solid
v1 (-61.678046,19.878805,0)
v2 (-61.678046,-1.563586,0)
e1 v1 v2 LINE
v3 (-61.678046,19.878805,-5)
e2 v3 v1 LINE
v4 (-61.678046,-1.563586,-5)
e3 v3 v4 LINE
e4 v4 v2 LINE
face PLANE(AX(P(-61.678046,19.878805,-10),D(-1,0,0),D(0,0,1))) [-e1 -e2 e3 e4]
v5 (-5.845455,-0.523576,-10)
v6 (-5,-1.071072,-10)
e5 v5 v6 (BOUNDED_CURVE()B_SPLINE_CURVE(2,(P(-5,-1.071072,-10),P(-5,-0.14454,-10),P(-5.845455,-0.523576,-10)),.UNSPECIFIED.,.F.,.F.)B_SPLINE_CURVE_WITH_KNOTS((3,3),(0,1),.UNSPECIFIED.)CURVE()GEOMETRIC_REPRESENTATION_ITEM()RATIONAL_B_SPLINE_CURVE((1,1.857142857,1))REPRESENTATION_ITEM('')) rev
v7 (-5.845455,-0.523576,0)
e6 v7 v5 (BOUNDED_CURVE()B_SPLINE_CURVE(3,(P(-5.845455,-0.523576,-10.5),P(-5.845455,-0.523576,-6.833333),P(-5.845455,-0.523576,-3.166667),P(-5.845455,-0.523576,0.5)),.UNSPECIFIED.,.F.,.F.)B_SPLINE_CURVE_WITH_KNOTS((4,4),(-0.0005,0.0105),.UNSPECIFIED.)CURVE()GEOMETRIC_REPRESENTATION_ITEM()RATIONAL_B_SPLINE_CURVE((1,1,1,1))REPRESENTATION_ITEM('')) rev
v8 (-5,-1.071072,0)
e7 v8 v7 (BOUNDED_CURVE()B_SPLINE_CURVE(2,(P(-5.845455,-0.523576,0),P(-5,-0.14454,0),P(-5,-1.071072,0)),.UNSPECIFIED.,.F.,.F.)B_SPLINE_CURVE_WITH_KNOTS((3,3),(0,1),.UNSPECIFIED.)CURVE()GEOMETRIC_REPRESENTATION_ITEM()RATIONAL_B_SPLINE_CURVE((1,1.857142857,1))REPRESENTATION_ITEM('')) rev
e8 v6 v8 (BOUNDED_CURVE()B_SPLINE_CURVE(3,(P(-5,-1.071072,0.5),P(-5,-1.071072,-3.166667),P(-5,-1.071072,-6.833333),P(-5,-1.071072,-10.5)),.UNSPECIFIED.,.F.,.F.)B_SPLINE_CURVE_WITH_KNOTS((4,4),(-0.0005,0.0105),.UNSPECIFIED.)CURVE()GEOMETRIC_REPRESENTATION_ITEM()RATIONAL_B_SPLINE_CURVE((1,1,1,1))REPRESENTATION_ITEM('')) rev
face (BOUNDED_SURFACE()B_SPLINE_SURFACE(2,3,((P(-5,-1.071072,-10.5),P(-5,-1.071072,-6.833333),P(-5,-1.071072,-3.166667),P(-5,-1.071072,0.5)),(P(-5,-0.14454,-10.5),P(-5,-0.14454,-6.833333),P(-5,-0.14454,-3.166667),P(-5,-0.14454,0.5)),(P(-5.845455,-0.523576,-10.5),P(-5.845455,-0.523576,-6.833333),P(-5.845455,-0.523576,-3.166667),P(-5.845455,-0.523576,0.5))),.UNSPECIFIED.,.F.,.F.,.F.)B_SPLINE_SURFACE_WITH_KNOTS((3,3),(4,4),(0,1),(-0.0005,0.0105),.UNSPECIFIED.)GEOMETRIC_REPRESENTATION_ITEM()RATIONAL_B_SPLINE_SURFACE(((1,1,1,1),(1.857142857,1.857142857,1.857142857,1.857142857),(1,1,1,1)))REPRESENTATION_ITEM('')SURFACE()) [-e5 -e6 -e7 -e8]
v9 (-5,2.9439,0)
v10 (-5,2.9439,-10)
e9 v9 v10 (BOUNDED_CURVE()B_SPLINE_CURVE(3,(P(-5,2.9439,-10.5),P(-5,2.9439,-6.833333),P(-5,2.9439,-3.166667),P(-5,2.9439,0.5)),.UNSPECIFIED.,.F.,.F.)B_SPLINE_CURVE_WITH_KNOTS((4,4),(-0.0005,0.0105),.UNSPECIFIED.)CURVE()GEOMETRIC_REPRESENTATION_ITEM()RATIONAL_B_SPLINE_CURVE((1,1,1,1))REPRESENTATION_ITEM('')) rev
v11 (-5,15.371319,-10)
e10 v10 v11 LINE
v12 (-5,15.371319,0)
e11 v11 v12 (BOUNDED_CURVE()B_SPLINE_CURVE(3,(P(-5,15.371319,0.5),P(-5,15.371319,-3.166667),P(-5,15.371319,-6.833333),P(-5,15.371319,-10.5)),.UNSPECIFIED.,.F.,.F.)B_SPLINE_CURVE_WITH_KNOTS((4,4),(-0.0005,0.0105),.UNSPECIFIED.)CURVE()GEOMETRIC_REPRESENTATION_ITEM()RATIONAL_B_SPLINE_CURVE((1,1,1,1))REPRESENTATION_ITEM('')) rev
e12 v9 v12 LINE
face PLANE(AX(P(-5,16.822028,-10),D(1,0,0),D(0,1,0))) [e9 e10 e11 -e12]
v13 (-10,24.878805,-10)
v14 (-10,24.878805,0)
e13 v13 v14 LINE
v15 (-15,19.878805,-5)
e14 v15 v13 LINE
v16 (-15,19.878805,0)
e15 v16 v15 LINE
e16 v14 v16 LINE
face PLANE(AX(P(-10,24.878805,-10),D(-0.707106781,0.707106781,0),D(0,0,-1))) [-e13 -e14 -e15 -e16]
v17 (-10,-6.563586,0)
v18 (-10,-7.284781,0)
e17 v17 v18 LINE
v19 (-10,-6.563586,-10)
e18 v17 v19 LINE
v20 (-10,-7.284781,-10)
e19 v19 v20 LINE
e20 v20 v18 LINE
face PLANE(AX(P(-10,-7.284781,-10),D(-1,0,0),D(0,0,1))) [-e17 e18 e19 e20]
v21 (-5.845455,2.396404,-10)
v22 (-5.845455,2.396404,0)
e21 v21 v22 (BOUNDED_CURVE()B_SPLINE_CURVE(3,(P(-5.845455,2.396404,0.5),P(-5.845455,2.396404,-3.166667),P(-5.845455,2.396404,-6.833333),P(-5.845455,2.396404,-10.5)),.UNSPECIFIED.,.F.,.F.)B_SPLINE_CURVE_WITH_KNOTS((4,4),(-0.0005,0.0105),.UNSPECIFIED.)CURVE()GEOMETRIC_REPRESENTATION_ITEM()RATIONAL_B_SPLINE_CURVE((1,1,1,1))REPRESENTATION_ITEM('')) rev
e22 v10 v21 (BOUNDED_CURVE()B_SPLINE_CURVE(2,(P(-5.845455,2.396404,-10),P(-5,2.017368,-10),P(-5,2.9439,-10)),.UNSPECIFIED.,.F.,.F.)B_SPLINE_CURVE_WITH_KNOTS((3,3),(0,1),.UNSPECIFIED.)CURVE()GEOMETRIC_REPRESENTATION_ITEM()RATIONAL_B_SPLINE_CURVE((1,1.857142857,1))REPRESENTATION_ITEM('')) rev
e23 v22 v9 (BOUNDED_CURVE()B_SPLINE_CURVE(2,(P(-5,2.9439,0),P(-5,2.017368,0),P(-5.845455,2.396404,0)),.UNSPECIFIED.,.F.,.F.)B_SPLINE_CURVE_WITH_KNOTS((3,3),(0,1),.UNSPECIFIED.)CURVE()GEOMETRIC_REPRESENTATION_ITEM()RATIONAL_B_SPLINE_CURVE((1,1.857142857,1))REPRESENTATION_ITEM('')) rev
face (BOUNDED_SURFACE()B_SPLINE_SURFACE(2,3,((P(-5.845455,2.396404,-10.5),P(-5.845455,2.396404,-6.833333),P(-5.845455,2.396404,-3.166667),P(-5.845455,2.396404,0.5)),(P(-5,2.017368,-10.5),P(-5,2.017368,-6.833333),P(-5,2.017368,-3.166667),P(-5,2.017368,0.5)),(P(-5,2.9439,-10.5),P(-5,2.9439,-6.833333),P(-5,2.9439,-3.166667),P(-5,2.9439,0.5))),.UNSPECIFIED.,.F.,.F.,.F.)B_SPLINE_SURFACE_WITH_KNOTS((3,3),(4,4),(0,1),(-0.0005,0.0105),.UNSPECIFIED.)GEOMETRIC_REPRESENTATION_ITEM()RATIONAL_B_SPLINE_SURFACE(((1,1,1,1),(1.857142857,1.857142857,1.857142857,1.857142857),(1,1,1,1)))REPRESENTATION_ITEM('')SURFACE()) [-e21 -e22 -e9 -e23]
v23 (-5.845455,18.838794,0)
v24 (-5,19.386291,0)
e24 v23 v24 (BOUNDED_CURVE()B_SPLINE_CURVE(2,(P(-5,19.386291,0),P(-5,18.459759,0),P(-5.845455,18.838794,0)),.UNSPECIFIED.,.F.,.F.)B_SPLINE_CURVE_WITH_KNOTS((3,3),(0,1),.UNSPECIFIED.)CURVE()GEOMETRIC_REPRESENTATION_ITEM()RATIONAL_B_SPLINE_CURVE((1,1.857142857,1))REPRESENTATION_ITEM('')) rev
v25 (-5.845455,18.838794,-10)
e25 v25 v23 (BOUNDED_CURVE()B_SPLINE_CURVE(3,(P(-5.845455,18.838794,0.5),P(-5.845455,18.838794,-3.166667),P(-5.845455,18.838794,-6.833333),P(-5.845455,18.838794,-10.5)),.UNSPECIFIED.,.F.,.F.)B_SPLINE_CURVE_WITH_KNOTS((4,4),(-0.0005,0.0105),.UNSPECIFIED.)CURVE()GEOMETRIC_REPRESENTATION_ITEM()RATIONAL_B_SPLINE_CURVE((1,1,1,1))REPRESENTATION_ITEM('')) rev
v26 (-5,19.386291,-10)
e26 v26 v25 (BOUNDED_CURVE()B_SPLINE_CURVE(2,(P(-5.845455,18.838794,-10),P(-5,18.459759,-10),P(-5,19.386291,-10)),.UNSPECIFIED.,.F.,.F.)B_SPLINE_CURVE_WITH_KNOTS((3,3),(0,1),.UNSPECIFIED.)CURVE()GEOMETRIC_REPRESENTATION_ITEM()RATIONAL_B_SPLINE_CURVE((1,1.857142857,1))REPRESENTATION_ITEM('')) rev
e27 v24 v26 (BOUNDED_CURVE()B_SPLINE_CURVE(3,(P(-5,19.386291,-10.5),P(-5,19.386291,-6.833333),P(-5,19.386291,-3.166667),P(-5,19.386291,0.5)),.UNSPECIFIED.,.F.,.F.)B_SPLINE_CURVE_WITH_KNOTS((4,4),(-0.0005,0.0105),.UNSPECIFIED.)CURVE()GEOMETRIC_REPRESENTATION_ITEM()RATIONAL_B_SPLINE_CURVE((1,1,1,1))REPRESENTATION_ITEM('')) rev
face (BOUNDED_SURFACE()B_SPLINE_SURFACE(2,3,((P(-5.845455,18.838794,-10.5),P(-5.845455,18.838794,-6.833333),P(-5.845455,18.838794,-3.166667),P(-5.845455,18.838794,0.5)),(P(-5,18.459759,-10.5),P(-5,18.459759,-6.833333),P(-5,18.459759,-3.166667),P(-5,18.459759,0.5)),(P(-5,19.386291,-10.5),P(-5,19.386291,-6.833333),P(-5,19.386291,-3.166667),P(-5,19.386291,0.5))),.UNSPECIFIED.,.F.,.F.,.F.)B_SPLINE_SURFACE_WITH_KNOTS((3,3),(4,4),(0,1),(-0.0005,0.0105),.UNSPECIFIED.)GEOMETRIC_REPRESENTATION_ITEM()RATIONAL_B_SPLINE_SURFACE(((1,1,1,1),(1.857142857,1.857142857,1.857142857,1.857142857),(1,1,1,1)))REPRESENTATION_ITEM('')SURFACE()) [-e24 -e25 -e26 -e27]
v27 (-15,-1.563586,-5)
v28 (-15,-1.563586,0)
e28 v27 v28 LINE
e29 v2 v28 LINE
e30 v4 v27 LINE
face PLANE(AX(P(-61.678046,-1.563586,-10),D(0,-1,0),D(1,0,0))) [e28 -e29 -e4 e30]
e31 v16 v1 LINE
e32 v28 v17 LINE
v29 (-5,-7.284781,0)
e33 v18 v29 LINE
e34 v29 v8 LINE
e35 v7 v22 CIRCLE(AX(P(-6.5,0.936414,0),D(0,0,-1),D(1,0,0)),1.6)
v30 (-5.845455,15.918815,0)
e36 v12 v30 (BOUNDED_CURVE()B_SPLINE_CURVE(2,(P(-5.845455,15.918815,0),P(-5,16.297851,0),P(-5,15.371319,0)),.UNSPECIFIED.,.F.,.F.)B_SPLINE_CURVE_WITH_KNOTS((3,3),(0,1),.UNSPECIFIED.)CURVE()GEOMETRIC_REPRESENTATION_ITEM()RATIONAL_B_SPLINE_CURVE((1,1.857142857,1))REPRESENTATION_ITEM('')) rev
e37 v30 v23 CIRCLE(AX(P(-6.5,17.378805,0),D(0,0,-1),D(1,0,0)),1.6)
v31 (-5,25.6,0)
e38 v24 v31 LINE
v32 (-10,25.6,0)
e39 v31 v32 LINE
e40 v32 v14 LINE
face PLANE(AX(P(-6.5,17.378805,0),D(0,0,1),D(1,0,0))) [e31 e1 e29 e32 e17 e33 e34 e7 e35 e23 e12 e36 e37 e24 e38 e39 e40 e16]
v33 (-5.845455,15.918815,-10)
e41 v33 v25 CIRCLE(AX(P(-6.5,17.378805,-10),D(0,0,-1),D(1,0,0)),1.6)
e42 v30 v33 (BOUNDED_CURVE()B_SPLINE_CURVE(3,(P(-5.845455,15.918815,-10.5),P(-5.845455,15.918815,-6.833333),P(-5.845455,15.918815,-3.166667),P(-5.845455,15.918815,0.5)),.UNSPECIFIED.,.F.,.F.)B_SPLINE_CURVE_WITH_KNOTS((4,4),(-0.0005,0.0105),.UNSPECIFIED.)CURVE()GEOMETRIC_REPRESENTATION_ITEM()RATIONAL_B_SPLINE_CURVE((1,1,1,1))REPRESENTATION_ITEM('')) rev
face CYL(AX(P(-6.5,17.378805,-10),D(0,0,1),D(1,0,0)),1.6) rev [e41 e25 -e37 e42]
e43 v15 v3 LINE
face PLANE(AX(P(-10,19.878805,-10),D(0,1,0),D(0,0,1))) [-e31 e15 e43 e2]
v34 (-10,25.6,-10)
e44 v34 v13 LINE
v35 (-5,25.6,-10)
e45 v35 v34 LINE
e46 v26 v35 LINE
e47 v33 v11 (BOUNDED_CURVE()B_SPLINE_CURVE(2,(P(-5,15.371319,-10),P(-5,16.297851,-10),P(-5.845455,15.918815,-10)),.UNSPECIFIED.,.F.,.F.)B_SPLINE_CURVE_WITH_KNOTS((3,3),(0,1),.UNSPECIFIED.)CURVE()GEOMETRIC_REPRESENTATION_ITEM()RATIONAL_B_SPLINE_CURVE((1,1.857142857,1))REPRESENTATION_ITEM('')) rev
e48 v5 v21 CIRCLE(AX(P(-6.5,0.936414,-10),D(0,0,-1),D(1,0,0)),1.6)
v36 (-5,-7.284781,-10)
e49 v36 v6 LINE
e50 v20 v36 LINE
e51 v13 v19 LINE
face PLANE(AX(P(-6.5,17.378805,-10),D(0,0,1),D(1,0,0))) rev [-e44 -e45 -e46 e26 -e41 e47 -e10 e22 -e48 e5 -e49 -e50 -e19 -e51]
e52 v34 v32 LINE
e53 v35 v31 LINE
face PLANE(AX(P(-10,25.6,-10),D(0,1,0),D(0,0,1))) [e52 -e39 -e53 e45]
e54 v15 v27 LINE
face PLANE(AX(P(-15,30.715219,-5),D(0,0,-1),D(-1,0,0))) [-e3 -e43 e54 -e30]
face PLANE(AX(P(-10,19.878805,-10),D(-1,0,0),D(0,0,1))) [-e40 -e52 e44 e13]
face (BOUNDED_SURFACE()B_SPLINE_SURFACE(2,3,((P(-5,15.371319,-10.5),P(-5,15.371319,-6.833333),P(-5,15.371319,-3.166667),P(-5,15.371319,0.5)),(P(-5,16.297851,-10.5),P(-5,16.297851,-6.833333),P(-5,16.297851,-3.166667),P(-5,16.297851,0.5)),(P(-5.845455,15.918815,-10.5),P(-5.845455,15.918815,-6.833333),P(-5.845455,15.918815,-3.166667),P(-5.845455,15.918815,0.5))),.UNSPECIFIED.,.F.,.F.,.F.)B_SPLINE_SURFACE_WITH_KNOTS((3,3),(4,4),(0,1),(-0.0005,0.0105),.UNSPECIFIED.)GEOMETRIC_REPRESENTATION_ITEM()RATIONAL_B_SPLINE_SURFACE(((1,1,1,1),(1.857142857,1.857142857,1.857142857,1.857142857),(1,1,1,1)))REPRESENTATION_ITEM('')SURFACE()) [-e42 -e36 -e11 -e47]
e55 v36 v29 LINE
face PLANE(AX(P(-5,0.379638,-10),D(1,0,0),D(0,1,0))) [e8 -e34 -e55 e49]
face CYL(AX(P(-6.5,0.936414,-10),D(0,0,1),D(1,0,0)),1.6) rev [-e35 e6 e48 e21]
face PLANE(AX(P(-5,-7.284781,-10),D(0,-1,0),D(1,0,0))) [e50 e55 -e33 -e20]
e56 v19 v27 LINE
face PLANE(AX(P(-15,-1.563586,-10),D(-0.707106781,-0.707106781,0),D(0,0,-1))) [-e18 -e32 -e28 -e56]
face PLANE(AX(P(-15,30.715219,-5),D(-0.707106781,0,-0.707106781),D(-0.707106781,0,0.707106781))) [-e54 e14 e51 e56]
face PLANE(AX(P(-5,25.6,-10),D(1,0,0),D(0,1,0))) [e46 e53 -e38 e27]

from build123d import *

# Parameters (mm, degrees)
SALIENTE_EXTRUIR1_DEPTH = 10
CHAFL_N1_SIZE           = 5
CORTAR_EXTRUIR1_DEPTH   = 38


with BuildPart() as part:
    # Croquis1 → Saliente-Extruir1 (new body)
    with BuildSketch(Plane.XY):
        with BuildLine():
            Line((-5, -7.284781413), (-10, -7.284781413))
            Line((-10, -7.284781413), (-10, -1.56358606))
            Line((-10, -1.56358606), (-61.678046138, -1.56358606))
            Line((-61.678046138, -1.56358606), (-61.678046138, 19.878804647))
            Line((-61.678046138, 19.878804647), (-10, 19.878804647))
            Line((-10, 19.878804647), (-10, 25.6))
            Line((-10, 25.6), (-5, 25.6))
            Line((-5, 25.6), (-5, 17.935581083))
            ThreePointArc((-5, 17.935581083), (-8.1, 17.378804647), (-5, 16.82202821))
            Line((-5, 16.82202821), (-5, 1.493190376))
            ThreePointArc((-5, 1.493190376), (-8.1, 0.93641394), (-5, 0.379637504))
            Line((-5, 0.379637504), (-5, -7.284781413))
        make_face()
    extrude(amount=-SALIENTE_EXTRUIR1_DEPTH)

    # Chaflán1
    chafl_n1_edges = [part.edges().sort_by_distance(p)[0] for p in [
        (-10, -1.56358606, -5),
        (-10, 19.878804647, -5),
    ]]
    chamfer(chafl_n1_edges, length=CHAFL_N1_SIZE)

    # Croquis2 → Cortar-Extruir1 (cut)
    with BuildSketch(Plane(origin=(-7.102128625, -7.284781413, 0), x_dir=(0, 0, -1), z_dir=(0, 1, 0))):
        Polygon((5, 7.897871375), (5, 54.575917513), (10, 54.575917513), (10, 2.897871375), align=None)
    extrude(amount=CORTAR_EXTRUIR1_DEPTH, mode=Mode.SUBTRACT)

    # Redondeo1
    # a fillet whose section is not a circle: 0.6 mm, written as the material it takes off along each edge
    with BuildSketch(Plane(origin=(-5, 17.935581083, 3.626773884), x_dir=(-0.6833782327560586, 0.730064511529773, 0), z_dir=(0, 0, -1)), Plane(origin=(-5, 1.493190376, 3.626773884), x_dir=(-0.6833782327560585, 0.7300645115297733, 0), z_dir=(0, 0, -1))) as redondeo1_piece_1:
        with BuildLine():
            Bezier((1.237169264, 0), (0.382683433, 0.358211533), (1.059111562, 0.991383331), weights=[1, 1.857142857, 1])
            Line((1.059111562, 0.991383331), (0, 0))
            ThreePointArc((0, 0), (0.618584632, 0.124414336), (1.237169264, 0))
        make_face()
    extrude(amount=17.253547769, mode=Mode.SUBTRACT)
    with BuildSketch(Plane(origin=(-5, 16.82202821, 3.626773884), x_dir=(0, -1, 0), z_dir=(0, 0, -1)), Plane(origin=(-5, 0.379637504, 3.626773884), x_dir=(0, -1, 0), z_dir=(0, 0, -1))) as redondeo1_piece_2:
        with BuildLine():
            Bezier((1.450709554, 0), (0.524177558, 0), (0.903213375, 0.845454545), weights=[1, 1.857142857, 1])
            ThreePointArc((0.903213375, 0.845454545), (0.536628736, 0.331896782), (0, 0))
            Line((0, 0), (1.450709554, 0))
        make_face()
    extrude(amount=17.253547769, mode=Mode.SUBTRACT)


solid = part.part
